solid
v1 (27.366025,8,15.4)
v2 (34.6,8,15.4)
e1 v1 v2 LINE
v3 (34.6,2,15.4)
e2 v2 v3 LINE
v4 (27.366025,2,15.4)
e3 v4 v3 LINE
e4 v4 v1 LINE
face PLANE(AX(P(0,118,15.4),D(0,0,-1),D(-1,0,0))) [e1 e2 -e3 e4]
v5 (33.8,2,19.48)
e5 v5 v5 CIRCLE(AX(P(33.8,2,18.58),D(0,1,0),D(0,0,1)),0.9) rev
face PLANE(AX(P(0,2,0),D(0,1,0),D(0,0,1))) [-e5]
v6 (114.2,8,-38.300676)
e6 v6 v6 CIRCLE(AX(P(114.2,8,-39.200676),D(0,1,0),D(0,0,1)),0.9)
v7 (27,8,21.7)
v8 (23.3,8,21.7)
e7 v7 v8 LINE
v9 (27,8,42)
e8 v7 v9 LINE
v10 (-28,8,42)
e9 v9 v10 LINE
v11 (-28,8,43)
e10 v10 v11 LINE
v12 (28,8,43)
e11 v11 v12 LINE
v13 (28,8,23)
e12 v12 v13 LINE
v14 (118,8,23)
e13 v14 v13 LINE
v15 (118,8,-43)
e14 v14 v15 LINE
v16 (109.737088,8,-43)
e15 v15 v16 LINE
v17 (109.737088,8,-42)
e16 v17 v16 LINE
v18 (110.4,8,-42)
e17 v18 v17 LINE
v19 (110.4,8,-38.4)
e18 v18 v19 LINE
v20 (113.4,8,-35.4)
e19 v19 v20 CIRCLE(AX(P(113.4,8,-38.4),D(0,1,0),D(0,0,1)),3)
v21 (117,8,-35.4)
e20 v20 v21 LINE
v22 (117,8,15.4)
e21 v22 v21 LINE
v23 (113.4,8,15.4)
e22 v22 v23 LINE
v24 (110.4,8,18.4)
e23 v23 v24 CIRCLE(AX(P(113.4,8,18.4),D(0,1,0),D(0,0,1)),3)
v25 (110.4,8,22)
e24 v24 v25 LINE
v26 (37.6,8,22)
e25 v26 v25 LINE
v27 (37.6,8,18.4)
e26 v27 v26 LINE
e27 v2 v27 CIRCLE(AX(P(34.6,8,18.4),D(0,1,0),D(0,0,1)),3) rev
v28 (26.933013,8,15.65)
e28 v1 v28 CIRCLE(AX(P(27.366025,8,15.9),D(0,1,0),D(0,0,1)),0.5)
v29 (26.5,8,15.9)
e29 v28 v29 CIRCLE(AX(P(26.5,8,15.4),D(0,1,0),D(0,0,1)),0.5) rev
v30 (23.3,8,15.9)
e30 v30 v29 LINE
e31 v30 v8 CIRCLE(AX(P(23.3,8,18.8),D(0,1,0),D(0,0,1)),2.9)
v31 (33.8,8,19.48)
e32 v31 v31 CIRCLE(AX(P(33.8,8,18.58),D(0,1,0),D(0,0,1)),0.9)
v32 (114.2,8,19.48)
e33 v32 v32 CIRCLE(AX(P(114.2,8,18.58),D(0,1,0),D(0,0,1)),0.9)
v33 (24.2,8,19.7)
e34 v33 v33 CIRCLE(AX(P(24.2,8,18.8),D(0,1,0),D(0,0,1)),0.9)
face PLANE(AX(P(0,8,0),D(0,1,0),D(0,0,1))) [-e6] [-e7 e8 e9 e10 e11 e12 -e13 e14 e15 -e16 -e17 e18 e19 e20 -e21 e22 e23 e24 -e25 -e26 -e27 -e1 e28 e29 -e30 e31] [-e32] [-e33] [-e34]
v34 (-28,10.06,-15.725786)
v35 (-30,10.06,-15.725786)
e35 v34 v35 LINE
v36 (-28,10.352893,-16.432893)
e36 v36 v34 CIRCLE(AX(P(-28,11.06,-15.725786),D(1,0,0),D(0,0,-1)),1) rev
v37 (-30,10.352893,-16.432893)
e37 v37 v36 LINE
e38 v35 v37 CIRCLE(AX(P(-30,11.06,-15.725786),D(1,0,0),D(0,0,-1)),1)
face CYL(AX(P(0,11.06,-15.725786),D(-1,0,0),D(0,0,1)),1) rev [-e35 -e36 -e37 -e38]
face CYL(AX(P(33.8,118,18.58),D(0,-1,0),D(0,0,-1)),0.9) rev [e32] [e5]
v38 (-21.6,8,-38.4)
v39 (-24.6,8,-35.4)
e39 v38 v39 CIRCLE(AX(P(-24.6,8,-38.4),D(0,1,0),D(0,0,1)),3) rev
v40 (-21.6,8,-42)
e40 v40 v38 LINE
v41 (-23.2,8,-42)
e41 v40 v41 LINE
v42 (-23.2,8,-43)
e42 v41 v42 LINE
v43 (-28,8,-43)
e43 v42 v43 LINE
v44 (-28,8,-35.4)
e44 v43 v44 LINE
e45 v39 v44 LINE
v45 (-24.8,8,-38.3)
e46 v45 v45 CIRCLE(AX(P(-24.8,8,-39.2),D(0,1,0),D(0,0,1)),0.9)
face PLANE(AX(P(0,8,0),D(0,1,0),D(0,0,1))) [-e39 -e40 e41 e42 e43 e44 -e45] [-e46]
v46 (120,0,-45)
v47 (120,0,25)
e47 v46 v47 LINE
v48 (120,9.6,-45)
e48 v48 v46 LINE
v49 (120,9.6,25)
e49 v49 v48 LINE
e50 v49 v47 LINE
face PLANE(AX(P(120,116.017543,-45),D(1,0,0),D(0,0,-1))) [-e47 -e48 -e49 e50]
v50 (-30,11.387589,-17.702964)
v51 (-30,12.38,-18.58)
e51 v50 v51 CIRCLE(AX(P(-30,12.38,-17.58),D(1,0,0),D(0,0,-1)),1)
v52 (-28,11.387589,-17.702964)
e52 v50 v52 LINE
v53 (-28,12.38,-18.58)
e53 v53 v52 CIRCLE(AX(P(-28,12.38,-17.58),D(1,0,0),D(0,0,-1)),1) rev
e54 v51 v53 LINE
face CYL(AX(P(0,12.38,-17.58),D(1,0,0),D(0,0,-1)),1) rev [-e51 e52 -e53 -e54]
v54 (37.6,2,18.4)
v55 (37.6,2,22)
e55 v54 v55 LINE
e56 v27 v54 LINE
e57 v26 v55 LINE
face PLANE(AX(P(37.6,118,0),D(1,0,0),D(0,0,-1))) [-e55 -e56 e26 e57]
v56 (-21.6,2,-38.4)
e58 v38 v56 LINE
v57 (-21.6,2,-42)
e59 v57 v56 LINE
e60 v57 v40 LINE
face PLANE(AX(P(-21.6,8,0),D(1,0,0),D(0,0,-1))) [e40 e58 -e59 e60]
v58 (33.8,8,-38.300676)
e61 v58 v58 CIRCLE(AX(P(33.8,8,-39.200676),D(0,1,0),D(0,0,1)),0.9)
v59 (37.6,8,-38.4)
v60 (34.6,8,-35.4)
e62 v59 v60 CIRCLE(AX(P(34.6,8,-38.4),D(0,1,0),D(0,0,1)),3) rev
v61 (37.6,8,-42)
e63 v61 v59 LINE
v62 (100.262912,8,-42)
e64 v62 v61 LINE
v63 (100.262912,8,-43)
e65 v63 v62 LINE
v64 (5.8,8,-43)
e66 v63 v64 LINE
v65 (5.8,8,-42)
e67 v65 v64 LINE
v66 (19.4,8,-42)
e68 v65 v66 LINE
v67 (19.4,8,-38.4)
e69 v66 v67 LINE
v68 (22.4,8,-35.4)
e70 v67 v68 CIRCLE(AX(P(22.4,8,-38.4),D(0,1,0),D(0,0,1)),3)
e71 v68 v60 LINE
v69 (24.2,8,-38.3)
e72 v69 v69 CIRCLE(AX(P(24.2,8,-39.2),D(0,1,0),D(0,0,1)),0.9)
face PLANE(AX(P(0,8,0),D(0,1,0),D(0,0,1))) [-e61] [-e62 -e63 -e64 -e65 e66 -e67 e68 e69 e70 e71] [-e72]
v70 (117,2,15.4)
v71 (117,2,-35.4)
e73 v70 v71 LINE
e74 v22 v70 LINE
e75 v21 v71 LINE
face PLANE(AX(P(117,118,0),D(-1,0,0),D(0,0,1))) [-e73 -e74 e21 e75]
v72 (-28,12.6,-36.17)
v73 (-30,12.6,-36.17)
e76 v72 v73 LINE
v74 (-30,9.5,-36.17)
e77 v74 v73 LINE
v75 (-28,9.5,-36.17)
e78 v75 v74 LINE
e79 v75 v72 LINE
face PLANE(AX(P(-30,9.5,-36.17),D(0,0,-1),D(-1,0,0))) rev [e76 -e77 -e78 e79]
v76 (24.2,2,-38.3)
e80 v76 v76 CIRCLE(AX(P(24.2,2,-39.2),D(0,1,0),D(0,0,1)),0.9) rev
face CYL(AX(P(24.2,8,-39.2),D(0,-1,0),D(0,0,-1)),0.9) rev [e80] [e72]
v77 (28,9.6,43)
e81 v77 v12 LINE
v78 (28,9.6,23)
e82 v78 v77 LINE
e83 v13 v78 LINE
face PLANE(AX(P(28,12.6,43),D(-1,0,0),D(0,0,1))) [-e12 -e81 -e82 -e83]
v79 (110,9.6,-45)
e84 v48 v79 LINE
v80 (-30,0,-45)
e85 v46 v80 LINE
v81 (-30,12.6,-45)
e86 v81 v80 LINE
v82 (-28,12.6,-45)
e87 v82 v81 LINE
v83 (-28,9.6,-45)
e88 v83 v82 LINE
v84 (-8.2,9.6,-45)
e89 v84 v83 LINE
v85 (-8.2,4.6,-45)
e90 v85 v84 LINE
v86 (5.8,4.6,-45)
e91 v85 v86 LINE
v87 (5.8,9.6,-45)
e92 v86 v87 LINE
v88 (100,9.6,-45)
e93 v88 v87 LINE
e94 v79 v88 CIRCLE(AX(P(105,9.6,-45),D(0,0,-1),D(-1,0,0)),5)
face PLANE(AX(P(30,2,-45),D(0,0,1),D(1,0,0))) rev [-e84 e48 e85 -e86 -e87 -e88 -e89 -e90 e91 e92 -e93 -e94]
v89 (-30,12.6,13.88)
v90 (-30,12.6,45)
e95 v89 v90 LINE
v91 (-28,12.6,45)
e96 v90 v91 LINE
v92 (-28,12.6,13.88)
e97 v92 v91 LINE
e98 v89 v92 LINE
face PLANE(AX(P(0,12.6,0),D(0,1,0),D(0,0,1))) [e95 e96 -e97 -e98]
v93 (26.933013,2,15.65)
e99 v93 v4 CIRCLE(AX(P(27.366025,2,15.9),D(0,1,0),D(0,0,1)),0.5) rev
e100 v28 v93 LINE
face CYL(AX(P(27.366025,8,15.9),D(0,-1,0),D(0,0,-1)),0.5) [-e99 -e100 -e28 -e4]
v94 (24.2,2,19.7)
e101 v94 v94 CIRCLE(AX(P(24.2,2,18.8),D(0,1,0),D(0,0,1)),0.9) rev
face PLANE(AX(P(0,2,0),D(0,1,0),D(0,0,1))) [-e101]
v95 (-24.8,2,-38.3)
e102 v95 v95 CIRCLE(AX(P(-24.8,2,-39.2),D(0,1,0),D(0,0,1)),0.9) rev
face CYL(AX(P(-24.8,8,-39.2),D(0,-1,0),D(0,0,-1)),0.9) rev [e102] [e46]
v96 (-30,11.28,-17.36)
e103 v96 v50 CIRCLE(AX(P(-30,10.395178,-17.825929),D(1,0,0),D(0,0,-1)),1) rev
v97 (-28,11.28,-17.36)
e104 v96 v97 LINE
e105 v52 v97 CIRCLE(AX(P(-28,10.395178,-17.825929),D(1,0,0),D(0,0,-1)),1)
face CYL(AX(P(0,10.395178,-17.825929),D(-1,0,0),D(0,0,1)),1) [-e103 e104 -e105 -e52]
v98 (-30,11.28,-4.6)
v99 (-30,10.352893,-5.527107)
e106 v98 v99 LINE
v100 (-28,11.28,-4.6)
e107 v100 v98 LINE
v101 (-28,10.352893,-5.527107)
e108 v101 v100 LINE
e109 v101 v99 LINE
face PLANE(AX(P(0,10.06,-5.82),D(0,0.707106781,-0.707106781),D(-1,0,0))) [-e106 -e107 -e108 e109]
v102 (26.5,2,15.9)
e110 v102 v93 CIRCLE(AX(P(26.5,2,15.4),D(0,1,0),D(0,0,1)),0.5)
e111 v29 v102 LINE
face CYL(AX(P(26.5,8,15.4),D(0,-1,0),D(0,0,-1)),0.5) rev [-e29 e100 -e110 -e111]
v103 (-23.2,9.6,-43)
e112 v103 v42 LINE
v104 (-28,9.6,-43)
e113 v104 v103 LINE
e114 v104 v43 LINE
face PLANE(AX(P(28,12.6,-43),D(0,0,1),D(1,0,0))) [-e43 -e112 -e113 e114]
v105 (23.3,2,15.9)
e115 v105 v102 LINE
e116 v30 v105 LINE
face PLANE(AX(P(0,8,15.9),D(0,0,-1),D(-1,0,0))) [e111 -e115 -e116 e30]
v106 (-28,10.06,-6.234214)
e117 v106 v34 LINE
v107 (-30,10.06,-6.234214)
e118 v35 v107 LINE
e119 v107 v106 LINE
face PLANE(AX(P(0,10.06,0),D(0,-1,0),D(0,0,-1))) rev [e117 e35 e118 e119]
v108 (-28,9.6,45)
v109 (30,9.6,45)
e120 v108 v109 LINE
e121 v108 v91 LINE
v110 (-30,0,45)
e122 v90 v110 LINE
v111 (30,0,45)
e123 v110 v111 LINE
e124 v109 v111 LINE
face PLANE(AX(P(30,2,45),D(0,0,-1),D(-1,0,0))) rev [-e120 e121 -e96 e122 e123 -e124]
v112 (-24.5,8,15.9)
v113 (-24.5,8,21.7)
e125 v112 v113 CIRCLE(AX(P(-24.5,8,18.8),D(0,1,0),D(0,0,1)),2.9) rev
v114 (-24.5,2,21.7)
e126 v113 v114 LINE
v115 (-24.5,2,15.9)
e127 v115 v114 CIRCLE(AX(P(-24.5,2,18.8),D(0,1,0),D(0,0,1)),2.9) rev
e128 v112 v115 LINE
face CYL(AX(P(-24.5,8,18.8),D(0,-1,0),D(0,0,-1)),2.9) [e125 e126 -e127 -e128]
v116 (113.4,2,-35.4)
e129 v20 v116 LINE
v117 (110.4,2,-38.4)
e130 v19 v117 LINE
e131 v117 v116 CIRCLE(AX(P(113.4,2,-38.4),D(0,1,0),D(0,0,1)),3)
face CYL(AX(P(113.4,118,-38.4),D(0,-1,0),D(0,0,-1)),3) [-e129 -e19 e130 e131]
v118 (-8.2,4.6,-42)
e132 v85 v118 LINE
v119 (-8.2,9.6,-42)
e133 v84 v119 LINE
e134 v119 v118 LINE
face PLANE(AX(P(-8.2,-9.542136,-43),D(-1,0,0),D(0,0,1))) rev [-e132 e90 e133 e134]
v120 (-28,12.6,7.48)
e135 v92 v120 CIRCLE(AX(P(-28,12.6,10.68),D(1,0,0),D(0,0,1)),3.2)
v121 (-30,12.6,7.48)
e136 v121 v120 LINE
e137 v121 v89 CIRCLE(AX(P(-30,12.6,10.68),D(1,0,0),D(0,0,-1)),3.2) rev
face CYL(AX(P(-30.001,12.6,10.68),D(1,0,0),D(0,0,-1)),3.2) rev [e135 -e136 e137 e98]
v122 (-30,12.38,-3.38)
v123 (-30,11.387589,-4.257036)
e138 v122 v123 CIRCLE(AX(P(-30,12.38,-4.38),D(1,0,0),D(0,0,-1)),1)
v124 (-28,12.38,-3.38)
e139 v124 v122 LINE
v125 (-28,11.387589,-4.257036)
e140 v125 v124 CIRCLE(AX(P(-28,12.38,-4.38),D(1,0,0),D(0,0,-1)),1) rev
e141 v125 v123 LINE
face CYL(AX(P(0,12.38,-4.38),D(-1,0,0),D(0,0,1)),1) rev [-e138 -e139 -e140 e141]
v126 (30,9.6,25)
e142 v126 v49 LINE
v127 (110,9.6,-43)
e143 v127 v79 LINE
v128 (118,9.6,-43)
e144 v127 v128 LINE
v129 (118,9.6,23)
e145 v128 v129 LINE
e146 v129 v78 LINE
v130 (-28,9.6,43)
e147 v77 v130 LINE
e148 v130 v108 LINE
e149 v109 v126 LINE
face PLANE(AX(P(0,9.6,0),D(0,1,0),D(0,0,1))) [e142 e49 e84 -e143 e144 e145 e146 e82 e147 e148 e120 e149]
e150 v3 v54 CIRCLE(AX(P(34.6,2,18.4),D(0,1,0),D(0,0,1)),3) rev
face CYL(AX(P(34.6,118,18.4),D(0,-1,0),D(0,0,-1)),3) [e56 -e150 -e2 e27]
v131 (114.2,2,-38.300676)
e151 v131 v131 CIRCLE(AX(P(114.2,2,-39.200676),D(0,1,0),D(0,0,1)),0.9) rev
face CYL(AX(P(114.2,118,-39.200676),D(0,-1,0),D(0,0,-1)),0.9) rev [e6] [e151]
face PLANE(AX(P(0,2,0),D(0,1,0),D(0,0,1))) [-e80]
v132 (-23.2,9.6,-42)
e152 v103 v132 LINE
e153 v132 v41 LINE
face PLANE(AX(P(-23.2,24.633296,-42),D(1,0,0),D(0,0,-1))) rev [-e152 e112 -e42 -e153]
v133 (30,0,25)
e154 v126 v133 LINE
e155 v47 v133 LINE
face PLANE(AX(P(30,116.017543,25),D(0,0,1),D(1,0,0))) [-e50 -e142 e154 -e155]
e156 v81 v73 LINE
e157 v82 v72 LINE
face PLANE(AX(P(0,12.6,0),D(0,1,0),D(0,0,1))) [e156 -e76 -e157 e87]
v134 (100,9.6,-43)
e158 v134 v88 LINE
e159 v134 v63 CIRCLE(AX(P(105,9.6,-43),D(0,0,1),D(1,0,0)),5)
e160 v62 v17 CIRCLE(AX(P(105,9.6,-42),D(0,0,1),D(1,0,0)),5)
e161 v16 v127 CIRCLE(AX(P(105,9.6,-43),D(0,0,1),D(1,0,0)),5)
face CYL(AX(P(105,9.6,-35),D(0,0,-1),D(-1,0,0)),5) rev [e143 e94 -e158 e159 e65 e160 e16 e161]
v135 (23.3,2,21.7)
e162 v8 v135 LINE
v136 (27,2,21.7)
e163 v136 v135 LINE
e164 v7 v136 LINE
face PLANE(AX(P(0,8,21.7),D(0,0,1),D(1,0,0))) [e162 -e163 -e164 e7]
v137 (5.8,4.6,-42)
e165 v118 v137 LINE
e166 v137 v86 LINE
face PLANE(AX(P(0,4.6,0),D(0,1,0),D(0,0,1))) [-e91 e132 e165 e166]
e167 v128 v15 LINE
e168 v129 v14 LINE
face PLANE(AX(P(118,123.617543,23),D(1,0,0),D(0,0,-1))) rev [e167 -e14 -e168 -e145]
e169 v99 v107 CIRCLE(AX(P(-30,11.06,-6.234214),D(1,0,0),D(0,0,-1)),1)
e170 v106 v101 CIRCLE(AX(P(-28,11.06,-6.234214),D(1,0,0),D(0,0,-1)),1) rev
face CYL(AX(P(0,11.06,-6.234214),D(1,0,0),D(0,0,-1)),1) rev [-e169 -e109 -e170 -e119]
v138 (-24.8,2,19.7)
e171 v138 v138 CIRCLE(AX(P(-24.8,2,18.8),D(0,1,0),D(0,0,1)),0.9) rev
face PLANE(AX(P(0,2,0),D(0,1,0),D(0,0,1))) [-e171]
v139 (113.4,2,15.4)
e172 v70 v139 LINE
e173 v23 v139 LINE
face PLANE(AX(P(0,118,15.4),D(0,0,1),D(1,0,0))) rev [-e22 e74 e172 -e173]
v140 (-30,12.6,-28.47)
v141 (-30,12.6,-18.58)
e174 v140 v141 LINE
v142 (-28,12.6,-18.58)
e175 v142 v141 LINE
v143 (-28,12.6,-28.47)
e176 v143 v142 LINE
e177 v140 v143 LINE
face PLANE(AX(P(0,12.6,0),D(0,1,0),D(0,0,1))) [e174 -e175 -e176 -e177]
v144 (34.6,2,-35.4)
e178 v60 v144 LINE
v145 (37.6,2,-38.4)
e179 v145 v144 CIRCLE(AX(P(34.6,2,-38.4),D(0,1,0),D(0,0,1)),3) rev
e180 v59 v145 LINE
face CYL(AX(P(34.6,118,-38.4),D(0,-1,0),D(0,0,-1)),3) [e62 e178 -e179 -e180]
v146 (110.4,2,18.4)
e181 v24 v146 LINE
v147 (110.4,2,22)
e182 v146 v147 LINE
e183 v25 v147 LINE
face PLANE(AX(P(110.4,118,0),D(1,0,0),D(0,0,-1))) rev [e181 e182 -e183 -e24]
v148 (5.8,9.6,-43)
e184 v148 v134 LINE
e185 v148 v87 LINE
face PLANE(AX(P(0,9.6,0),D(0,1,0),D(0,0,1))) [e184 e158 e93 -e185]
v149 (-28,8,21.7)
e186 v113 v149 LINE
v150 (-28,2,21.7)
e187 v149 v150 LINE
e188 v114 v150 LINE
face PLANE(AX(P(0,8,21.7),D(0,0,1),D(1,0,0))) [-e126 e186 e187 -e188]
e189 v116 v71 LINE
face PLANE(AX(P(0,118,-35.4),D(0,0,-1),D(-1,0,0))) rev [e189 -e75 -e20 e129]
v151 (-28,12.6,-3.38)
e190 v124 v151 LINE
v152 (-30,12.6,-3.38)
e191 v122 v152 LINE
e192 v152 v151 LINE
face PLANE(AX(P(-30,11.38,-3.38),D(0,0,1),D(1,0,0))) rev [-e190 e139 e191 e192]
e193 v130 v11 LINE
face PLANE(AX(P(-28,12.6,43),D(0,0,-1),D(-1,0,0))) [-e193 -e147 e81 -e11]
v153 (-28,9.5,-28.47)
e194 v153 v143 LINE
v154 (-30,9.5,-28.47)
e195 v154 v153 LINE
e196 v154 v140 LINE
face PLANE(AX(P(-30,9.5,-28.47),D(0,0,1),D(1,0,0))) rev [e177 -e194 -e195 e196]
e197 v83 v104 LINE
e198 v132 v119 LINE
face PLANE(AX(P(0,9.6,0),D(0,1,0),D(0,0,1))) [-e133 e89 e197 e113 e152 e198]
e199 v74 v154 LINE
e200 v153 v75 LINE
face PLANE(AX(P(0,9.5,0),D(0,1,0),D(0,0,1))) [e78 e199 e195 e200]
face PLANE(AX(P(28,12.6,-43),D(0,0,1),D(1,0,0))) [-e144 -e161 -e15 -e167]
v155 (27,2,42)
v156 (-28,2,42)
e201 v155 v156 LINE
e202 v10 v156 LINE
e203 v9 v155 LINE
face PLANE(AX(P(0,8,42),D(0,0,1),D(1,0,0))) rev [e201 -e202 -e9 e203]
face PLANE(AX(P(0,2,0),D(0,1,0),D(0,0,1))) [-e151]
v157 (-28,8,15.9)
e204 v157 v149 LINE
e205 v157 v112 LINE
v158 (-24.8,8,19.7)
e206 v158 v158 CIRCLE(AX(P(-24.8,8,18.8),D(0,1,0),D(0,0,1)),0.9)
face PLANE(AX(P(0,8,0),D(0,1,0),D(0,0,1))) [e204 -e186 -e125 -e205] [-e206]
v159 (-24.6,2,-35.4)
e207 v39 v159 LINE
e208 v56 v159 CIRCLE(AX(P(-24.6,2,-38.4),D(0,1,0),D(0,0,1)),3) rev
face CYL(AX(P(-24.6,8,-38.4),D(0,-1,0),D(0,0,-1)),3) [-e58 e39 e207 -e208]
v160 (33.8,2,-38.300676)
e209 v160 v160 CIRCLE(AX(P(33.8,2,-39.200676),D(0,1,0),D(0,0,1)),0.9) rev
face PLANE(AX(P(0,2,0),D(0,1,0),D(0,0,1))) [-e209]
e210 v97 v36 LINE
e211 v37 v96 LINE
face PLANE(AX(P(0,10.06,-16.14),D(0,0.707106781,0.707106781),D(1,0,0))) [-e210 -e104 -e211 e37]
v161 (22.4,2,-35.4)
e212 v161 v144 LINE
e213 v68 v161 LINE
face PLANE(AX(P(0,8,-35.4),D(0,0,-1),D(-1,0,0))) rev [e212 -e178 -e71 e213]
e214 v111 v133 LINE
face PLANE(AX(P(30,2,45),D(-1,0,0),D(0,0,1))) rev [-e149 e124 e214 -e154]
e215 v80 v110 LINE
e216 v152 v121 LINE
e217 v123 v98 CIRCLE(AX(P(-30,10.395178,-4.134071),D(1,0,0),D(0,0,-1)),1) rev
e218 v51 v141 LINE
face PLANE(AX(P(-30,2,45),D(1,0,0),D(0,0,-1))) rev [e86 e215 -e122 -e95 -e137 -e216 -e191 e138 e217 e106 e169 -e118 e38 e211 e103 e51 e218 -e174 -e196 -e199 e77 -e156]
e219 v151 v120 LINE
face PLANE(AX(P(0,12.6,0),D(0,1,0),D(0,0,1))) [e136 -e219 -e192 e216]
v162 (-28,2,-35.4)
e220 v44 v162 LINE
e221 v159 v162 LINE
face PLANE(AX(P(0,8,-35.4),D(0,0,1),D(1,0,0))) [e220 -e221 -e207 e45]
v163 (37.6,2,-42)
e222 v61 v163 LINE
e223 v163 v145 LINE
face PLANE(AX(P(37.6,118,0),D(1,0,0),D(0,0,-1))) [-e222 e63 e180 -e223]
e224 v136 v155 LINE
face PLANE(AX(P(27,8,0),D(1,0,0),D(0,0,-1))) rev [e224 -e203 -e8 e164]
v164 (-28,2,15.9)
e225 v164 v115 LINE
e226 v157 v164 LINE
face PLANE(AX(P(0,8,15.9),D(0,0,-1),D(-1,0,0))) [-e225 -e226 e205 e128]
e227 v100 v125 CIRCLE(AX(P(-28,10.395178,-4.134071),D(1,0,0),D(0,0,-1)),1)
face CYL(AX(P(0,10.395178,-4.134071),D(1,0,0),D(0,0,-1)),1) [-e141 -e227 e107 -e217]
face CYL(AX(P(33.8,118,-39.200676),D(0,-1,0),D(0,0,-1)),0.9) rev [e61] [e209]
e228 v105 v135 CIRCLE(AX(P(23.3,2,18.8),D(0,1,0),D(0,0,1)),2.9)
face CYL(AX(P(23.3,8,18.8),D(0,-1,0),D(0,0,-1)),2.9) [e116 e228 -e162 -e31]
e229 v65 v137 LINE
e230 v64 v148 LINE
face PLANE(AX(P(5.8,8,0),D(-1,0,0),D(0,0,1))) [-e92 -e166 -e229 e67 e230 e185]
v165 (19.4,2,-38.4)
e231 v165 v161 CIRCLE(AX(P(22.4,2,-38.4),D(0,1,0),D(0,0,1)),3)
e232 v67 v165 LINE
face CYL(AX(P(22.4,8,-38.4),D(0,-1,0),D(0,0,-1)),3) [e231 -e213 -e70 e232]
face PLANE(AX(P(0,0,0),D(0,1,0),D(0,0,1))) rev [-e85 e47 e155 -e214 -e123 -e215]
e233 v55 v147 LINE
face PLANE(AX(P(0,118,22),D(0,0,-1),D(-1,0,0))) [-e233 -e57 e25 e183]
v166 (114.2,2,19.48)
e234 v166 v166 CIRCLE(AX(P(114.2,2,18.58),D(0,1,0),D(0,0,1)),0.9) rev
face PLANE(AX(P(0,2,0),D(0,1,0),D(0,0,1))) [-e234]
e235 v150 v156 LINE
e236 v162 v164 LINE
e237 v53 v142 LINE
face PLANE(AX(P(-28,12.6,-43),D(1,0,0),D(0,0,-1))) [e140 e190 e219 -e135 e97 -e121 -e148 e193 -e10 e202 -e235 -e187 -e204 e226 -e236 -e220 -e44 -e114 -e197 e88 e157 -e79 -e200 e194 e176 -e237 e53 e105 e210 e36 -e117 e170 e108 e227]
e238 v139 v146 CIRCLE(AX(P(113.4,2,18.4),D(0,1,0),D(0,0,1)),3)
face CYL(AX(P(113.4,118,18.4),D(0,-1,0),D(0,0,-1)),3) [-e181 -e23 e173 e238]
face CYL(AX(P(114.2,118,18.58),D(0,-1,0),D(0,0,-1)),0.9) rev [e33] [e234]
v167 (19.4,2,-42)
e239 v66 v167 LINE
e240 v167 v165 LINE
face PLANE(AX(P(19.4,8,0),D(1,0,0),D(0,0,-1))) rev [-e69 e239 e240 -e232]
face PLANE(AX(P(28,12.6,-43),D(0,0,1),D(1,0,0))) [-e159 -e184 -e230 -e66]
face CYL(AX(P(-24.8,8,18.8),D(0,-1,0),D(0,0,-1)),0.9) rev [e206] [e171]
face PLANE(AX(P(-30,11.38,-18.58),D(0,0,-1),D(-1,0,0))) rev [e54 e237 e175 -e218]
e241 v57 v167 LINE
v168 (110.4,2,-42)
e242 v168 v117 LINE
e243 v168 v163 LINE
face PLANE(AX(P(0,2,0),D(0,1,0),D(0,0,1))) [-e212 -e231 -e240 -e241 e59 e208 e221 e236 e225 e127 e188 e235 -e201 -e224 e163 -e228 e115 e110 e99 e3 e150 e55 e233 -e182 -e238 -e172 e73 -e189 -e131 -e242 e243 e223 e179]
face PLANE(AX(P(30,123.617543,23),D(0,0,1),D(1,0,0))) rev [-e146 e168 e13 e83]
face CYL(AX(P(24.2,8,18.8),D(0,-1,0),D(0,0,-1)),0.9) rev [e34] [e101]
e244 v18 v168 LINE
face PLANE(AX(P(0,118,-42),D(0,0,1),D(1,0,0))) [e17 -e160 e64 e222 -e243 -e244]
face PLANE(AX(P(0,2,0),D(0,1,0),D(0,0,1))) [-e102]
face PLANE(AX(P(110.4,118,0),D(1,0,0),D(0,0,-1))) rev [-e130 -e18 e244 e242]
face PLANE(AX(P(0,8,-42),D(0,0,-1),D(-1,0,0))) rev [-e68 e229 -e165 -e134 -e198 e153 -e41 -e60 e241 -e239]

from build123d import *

# Parameters (mm, degrees)
SKETCH1_W           = 60
SKETCH1_H           = 90
BOSS_EXTRUDE1_DEPTH = 2
SKETCH2_W           = 60
SKETCH2_H           = 90
SKETCH2_W_2         = 56
SKETCH2_H_2         = 86
BOSS_EXTRUDE2_DEPTH = 10.6
CUT_EXTRUDE1_DEPTH  = 3
SKETCH15_W          = 90
SKETCH15_H          = 70
BOSS_EXTRUDE6_DEPTH = 2
BOSS_EXTRUDE7_DEPTH = 7.6
SKETCH4_R           = 0.9
BOSS_EXTRUDE3_DEPTH = 6
SKETCH18_W          = 2
SKETCH18_H          = 66
CUT_EXTRUDE11_DEPTH = 1.6
SKETCH7_W           = 14
SKETCH7_H           = 1
BOSS_EXTRUDE4_DEPTH = 2.6
SKETCH8_W           = 14
SKETCH8_H           = 2
CUT_EXTRUDE2_DEPTH  = 5
SKETCH9_W           = 15
SKETCH9_H           = 1
BOSS_EXTRUDE5_DEPTH = 7.6
SKETCH10_W          = 2
SKETCH10_H          = 7.7
CUT_EXTRUDE3_DEPTH  = 3.1
SKETCH11_W          = 2
SKETCH11_H          = 15.2
CUT_EXTRUDE4_DEPTH  = 1.22
SKETCH12_W          = 2
SKETCH12_H          = 12.76
CUT_EXTRUDE6_DEPTH  = 1.32
CUT_EXTRUDE7_REACH  = 157.202
FILLET6_R           = 1
CHAMFER2_SIZE       = 1.22
FILLET7_R           = 1
SKETCH19_W          = 88
SKETCH19_H          = 66
SKETCH19_W_2        = 86
SKETCH19_H_2        = 64
SKETCH19_R          = 0.9
BOSS_EXTRUDE9_DEPTH = 6
SKETCH20_W          = 4
SKETCH20_H          = 50.8
CUT_EXTRUDE12_DEPTH = 6
FILLET8_R           = 0.5
FILLET9_R           = 0.5
CUT_EXTRUDE13_DEPTH = 10


# Some blends are built 0.0001 mm under size
with BuildPart() as part:
    # Sketch1 → Boss-Extrude1 (new body)
    with BuildSketch(Plane(origin=(0, 0, 0), x_dir=(1, 0, 0), z_dir=(0, 1, 0))):
        Rectangle(SKETCH1_W, SKETCH1_H)
    extrude(amount=BOSS_EXTRUDE1_DEPTH)

    # Sketch2 → Boss-Extrude2 (add)
    with BuildSketch(Plane(origin=(0, 2, 0), x_dir=(1, 0, 0), z_dir=(0, 1, 0))):
        Rectangle(SKETCH2_W, SKETCH2_H)
        Rectangle(SKETCH2_W_2, SKETCH2_H_2, mode=Mode.SUBTRACT)
    extrude(amount=BOSS_EXTRUDE2_DEPTH)

    # Sketch3 → Cut-Extrude1 (cut)
    with BuildSketch(Plane(origin=(0, 12.6, 0), x_dir=(1, 0, 0), z_dir=(0, 1, 0))):
        Polygon((-28, -43), (28, -43), (28, 43), (-28, 43), (-28, 45), (30, 45), (30, -45), (-28, -45), align=None)
    extrude(amount=-CUT_EXTRUDE1_DEPTH, mode=Mode.SUBTRACT)

    # Sketch15 → Boss-Extrude6 (add)
    with BuildSketch(Plane.XZ):
        with Locations((75, -10)):
            Rectangle(SKETCH15_W, SKETCH15_H)
    extrude(amount=-BOSS_EXTRUDE6_DEPTH)

    # Sketch16 → Boss-Extrude7 (add)
    with BuildSketch(Plane(origin=(0, 2, 0), x_dir=(1, 0, 0), z_dir=(0, 1, 0))):
        Polygon((118, 43), (30, 43), (30, 45), (120, 45), (120, -25), (30, -25), (30, -23), (118, -23), align=None)
    extrude(amount=BOSS_EXTRUDE7_DEPTH)

    # Sketch4 → Boss-Extrude3 (add)
    # profile 1 of 5: a face of its own
    with BuildSketch(Plane(origin=(0, 2, 0), x_dir=(1, 0, 0), z_dir=(0, 1, 0))):
        with BuildLine():
            Line((24.2, -21.7), (27, -21.7))
            Line((27, -21.7), (27, -42))
            Line((27, -42), (-28, -42))
            Line((-28, -42), (-28, -43))
            Line((-28, -43), (28, -43))
            Line((28, -43), (28, 43))
            Line((28, 43), (5.8, 43))
            Line((5.8, 43), (5.8, 42))
            Line((5.8, 42), (19.4, 42))
            Line((19.4, 42), (27, 42))
            Line((27, 42), (27, 35.4))
            Line((27, 35.4), (27, -15.9))
            Line((27, -15.9), (24.2, -15.9))
            Line((24.2, -15.9), (24.2, -17.9))
            ThreePointArc((24.2, -17.9), (24.836396103, -18.163603897), (25.1, -18.8))
            ThreePointArc((25.1, -18.8), (24.836396103, -19.436396103), (24.2, -19.7))
            Line((24.2, -19.7), (24.2, -21.7))
        make_face()
    # profile 2 of 5: a face of its own
    with BuildSketch(Plane(origin=(0, 2, 0), x_dir=(1, 0, 0), z_dir=(0, 1, 0))):
        with BuildLine():
            Line((23.3, -21.7), (24.2, -21.7))
            Line((24.2, -21.7), (24.2, -19.7))
            ThreePointArc((24.2, -19.7), (23.3, -18.8), (24.2, -17.9))
            Line((24.2, -17.9), (24.2, -15.9))
            Line((24.2, -15.9), (23.3, -15.9))
            ThreePointArc((23.3, -15.9), (20.4, -18.8), (23.3, -21.7))
        make_face()
    # profile 3 of 5: a face of its own
    with BuildSketch(Plane(origin=(0, 2, 0), x_dir=(1, 0, 0), z_dir=(0, 1, 0))):
        with BuildLine():
            Line((-28, -15.9), (-28, -21.7))
            Line((-28, -21.7), (-24.5, -21.7))
            ThreePointArc((-24.5, -21.7), (-21.6, -18.8), (-24.5, -15.9))
            Line((-24.5, -15.9), (-28, -15.9))
        make_face()
        with Locations(Location((-24.8, -18.8, 0), (0, 0, 270))):
            Circle(SKETCH4_R, mode=Mode.SUBTRACT)
    # profile 4 of 5: a face of its own
    with BuildSketch(Plane(origin=(0, 2, 0), x_dir=(1, 0, 0), z_dir=(0, 1, 0))):
        with BuildLine():
            Line((-28, 43), (-28, 35.4))
            Line((-28, 35.4), (-24.6, 35.4))
            ThreePointArc((-24.6, 35.4), (-22.478679656, 36.278679656), (-21.6, 38.4))
            Line((-21.6, 38.4), (-21.6, 43))
            Line((-21.6, 43), (-28, 43))
        make_face()
        with Locations(Location((-24.8, 39.2, 0), (0, 0, 270))):
            Circle(SKETCH4_R, mode=Mode.SUBTRACT)
    # profile 5 of 5: a face of its own
    with BuildSketch(Plane(origin=(0, 2, 0), x_dir=(1, 0, 0), z_dir=(0, 1, 0))):
        with BuildLine():
            Line((22.4, 35.4), (27, 35.4))
            Line((27, 35.4), (27, 42))
            Line((27, 42), (19.4, 42))
            Line((19.4, 42), (19.4, 38.4))
            ThreePointArc((19.4, 38.4), (20.278679656, 36.278679656), (22.4, 35.4))
        make_face()
        with Locations(Location((24.2, 39.2, 0), (0, 0, 270))):
            Circle(SKETCH4_R, mode=Mode.SUBTRACT)
    extrude(amount=BOSS_EXTRUDE3_DEPTH)

    # Sketch18 → Cut-Extrude11 (cut)
    with BuildSketch(Plane(origin=(0, 9.6, 0), x_dir=(1, 0, 0), z_dir=(0, 1, 0))):
        with Locations((29, 10)):
            Rectangle(SKETCH18_W, SKETCH18_H)
    extrude(amount=-CUT_EXTRUDE11_DEPTH, mode=Mode.SUBTRACT)

    # Sketch7 → Boss-Extrude4 (add)
    with BuildSketch(Plane(origin=(0, 2, 0), x_dir=(1, 0, 0), z_dir=(0, 1, 0))):
        with Locations((-1.2, 42.5)):
            Rectangle(SKETCH7_W, SKETCH7_H)
    extrude(amount=BOSS_EXTRUDE4_DEPTH)

    # Sketch8 → Cut-Extrude2 (cut)
    with BuildSketch(Plane(origin=(0, 9.6, 0), x_dir=(1, 0, 0), z_dir=(0, 1, 0))):
        with Locations((-1.2, 44)):
            Rectangle(SKETCH8_W, SKETCH8_H)
    extrude(amount=-CUT_EXTRUDE2_DEPTH, mode=Mode.SUBTRACT)

    # Sketch9 → Boss-Extrude5 (add)
    with BuildSketch(Plane(origin=(0, 2, 0), x_dir=(1, 0, 0), z_dir=(0, 1, 0))):
        with Locations((-15.7, 42.5)):
            Rectangle(SKETCH9_W, SKETCH9_H)
    extrude(amount=BOSS_EXTRUDE5_DEPTH)

    # Sketch10 → Cut-Extrude3 (cut)
    with BuildSketch(Plane(origin=(0, 12.6, 0), x_dir=(1, 0, 0), z_dir=(0, 1, 0))):
        with Locations((-29, 32.32)):
            Rectangle(SKETCH10_W, SKETCH10_H)
    extrude(amount=-CUT_EXTRUDE3_DEPTH, mode=Mode.SUBTRACT)

    # Sketch11 → Cut-Extrude4 (cut)
    with BuildSketch(Plane(origin=(0, 12.6, 0), x_dir=(1, 0, 0), z_dir=(0, 1, 0))):
        with Locations((-29, 10.98)):
            Rectangle(SKETCH11_W, SKETCH11_H)
    extrude(amount=-CUT_EXTRUDE4_DEPTH, mode=Mode.SUBTRACT)

    # Sketch12 → Cut-Extrude6 (cut)
    with BuildSketch(Plane(origin=(0, 11.38, 0), x_dir=(1, 0, 0), z_dir=(0, 1, 0))):
        with Locations((-29, 10.98)):
            Rectangle(SKETCH12_W, SKETCH12_H)
    extrude(amount=-CUT_EXTRUDE6_DEPTH, mode=Mode.SUBTRACT)

    # Sketch13 → Cut-Extrude7 (cut, up to next)
    with BuildSketch(Plane(origin=(-28, 0, 0), x_dir=(0, 0, -1), z_dir=(1, 0, 0)), mode=Mode.PRIVATE) as cut_extrude7_sk1:
        with BuildLine():
            Line((-13.88, 12.6), (-7.48, 12.6))
            ThreePointArc((-7.48, 12.6), (-10.68, 9.4), (-13.88, 12.6))
        make_face()
    cut_extrude7_tool1 = extrude(cut_extrude7_sk1.sketch, amount=-CUT_EXTRUDE7_REACH, mode=Mode.PRIVATE) & part.part
    add(cut_extrude7_tool1.solids().sort_by_distance((-28, 11.241878, 10.68))[0], mode=Mode.SUBTRACT)

    # Fillet6
    fillet6_edges = [part.edges().sort_by_distance(p)[0] for p in [
        (-29, 11.38, -18.58),
        (-29, 11.38, -3.38),
    ]]
    fillet(fillet6_edges, radius=FILLET6_R)

    # Chamfer2
    chamfer2_edges = [part.edges().sort_by_distance(p)[0] for p in [
        (-29, 10.06, -17.36),
        (-29, 10.06, -4.6),
    ]]
    chamfer(chamfer2_edges, length=CHAMFER2_SIZE)

    # Fillet7
    # the kernel refuses this fillet: 1 mm, written as the material it adds along each edge
    with BuildSketch(Plane(origin=(-28, 10.06, -16.14), x_dir=(0, 0.7071067811865454, -0.7071067811865497), z_dir=(-1, 0, 0))) as fillet7_piece_1:
        with BuildLine():
            CenterArc((FILLET7_R * 0.414213562373, -FILLET7_R), FILLET7_R, 90, 45)
            Line((-FILLET7_R * 0.292893218813, -FILLET7_R * 0.292893218813), (0, 0))
            Line((0, 0), (FILLET7_R * 0.414213562373, 0))
        make_face()
    extrude(amount=2)
    with BuildSketch(Plane(origin=(-30, 10.06, -5.82), x_dir=(0, 0, -1), z_dir=(1, 0, 0))) as fillet7_piece_2:
        with BuildLine():
            CenterArc((FILLET7_R * 0.414213562373, FILLET7_R), FILLET7_R, 225, 45)
            Line((-FILLET7_R * 0.292893218813, FILLET7_R * 0.292893218813), (0, 0))
            Line((0, 0), (FILLET7_R * 0.414213562373, 0))
        make_face()
    extrude(amount=2)
    # the kernel refuses this fillet: 1 mm, written as the material it takes off along each edge
    with BuildSketch(Plane(origin=(-30.857621037, 11.38, -4.6), x_dir=(0, -1.0, 1.3882228699547056e-11), z_dir=(1, 0, 0)), Plane(origin=(-27.142378963, 11.38, -17.36), x_dir=(0, -1.0, -1.3891110483744069e-11), z_dir=(-1, 0, 0))) as fillet7_2_piece_1:
        with BuildLine():
            CenterArc((0.984822149, -0.465928927), FILLET7_R, 152.229642834, 20.707135911)
            Line((-0.007588926, -0.342964463), (-0.106830033, -0.330668017))
            ThreePointArc((-0.106830033, -0.330668017), (-0.1, -0.22), (-0.1, 0))
            Line((-0.1, 0), (0, 0.1))
            ThreePointArc((0, 0.1), (0.05, 0.1), (0.011517785, 0.046592893))
            Line((0.011517785, 0.046592893), (0.1, 0))
        make_face()
    extrude(amount=3.715242074, mode=Mode.SUBTRACT)

    # Sketch19 → Boss-Extrude9 (add)
    # profile 1 of 5: a face of its own
    with BuildSketch(Plane(origin=(0, 2, 0), x_dir=(1, 0, 0), z_dir=(0, 1, 0))):
        with Locations((74, 10)):
            Rectangle(SKETCH19_W, SKETCH19_H)
        with Locations((74, 10)):
            Rectangle(SKETCH19_W_2, SKETCH19_H_2, mode=Mode.SUBTRACT)
    # profile 2 of 5: a face of its own
    with BuildSketch(Plane(origin=(0, 2, 0), x_dir=(1, 0, 0), z_dir=(0, 1, 0))):
        with BuildLine():
            Line((37.6, 38.4), (37.6, 42))
            Line((37.6, 42), (31, 42))
            Line((31, 42), (31, 35.4))
            Line((31, 35.4), (34.6, 35.4))
            ThreePointArc((34.6, 35.4), (36.721320344, 36.278679656), (37.6, 38.4))
        make_face()
        with Locations(Location((33.8, 39.200675532, 0), (0, 0, 270))):
            Circle(SKETCH19_R, mode=Mode.SUBTRACT)
    # profile 3 of 5: a face of its own
    with BuildSketch(Plane(origin=(0, 2, 0), x_dir=(1, 0, 0), z_dir=(0, 1, 0))):
        with BuildLine():
            Line((117, 35.4), (117, 42))
            Line((117, 42), (110.4, 42))
            Line((110.4, 42), (110.4, 38.4))
            ThreePointArc((110.4, 38.4), (111.278679656, 36.278679656), (113.4, 35.4))
            Line((113.4, 35.4), (117, 35.4))
        make_face()
        with Locations(Location((114.2, 39.200675532, 0), (0, 0, 270))):
            Circle(SKETCH19_R, mode=Mode.SUBTRACT)
    # profile 4 of 5: a face of its own
    with BuildSketch(Plane(origin=(0, 2, 0), x_dir=(1, 0, 0), z_dir=(0, 1, 0))):
        with BuildLine():
            Line((117, -22), (117, -15.4))
            Line((117, -15.4), (113.4, -15.4))
            ThreePointArc((113.4, -15.4), (111.278679656, -16.278679656), (110.4, -18.4))
            Line((110.4, -18.4), (110.4, -22))
            Line((110.4, -22), (117, -22))
        make_face()
        with Locations(Location((114.2, -18.58, 0), (0, 0, 270))):
            Circle(SKETCH19_R, mode=Mode.SUBTRACT)
    # profile 5 of 5: a face of its own
    with BuildSketch(Plane(origin=(0, 2, 0), x_dir=(1, 0, 0), z_dir=(0, 1, 0))):
        with BuildLine():
            Line((34.6, -15.4), (31, -15.4))
            Line((31, -15.4), (31, -22))
            Line((31, -22), (37.6, -22))
            Line((37.6, -22), (37.6, -18.4))
            ThreePointArc((37.6, -18.4), (36.721320344, -16.278679656), (34.6, -15.4))
        make_face()
        with Locations(Location((33.8, -18.58, 0), (0, 0, 270))):
            Circle(SKETCH19_R, mode=Mode.SUBTRACT)
    extrude(amount=BOSS_EXTRUDE9_DEPTH)

    # Sketch20 → Cut-Extrude12 (cut)
    with BuildSketch(Plane(origin=(0, 8, 0), x_dir=(1, 0, 0), z_dir=(0, 1, 0))):
        with Locations((29, 10)):
            Rectangle(SKETCH20_W, SKETCH20_H)
    extrude(amount=-CUT_EXTRUDE12_DEPTH, mode=Mode.SUBTRACT)

    # Fillet8
    fillet8_edges = [part.edges().sort_by_distance(p)[0] for p in [
        (27, 5, 15.9),
    ]]
    fillet(fillet8_edges, radius=FILLET8_R - 0.0001)  # a hair under: the kernel refuses the full size

    # Fillet9
    fillet9_edges = [part.edges().sort_by_distance(p)[0] for p in [
        (27, 5, 15.4),
    ]]
    fillet(fillet9_edges, radius=FILLET9_R)

    # Sketch21 → Cut-Extrude13 (cut)
    with BuildSketch(Plane(origin=(0, 0, -45), x_dir=(-1, 0, 0), z_dir=(0, 0, -1))):
        with BuildLine():
            Line((-110, 9.6), (-100, 9.6))
            ThreePointArc((-100, 9.6), (-105, 4.6), (-110, 9.6))
        make_face()
    extrude(amount=-CUT_EXTRUDE13_DEPTH, mode=Mode.SUBTRACT)


solid = part.part
